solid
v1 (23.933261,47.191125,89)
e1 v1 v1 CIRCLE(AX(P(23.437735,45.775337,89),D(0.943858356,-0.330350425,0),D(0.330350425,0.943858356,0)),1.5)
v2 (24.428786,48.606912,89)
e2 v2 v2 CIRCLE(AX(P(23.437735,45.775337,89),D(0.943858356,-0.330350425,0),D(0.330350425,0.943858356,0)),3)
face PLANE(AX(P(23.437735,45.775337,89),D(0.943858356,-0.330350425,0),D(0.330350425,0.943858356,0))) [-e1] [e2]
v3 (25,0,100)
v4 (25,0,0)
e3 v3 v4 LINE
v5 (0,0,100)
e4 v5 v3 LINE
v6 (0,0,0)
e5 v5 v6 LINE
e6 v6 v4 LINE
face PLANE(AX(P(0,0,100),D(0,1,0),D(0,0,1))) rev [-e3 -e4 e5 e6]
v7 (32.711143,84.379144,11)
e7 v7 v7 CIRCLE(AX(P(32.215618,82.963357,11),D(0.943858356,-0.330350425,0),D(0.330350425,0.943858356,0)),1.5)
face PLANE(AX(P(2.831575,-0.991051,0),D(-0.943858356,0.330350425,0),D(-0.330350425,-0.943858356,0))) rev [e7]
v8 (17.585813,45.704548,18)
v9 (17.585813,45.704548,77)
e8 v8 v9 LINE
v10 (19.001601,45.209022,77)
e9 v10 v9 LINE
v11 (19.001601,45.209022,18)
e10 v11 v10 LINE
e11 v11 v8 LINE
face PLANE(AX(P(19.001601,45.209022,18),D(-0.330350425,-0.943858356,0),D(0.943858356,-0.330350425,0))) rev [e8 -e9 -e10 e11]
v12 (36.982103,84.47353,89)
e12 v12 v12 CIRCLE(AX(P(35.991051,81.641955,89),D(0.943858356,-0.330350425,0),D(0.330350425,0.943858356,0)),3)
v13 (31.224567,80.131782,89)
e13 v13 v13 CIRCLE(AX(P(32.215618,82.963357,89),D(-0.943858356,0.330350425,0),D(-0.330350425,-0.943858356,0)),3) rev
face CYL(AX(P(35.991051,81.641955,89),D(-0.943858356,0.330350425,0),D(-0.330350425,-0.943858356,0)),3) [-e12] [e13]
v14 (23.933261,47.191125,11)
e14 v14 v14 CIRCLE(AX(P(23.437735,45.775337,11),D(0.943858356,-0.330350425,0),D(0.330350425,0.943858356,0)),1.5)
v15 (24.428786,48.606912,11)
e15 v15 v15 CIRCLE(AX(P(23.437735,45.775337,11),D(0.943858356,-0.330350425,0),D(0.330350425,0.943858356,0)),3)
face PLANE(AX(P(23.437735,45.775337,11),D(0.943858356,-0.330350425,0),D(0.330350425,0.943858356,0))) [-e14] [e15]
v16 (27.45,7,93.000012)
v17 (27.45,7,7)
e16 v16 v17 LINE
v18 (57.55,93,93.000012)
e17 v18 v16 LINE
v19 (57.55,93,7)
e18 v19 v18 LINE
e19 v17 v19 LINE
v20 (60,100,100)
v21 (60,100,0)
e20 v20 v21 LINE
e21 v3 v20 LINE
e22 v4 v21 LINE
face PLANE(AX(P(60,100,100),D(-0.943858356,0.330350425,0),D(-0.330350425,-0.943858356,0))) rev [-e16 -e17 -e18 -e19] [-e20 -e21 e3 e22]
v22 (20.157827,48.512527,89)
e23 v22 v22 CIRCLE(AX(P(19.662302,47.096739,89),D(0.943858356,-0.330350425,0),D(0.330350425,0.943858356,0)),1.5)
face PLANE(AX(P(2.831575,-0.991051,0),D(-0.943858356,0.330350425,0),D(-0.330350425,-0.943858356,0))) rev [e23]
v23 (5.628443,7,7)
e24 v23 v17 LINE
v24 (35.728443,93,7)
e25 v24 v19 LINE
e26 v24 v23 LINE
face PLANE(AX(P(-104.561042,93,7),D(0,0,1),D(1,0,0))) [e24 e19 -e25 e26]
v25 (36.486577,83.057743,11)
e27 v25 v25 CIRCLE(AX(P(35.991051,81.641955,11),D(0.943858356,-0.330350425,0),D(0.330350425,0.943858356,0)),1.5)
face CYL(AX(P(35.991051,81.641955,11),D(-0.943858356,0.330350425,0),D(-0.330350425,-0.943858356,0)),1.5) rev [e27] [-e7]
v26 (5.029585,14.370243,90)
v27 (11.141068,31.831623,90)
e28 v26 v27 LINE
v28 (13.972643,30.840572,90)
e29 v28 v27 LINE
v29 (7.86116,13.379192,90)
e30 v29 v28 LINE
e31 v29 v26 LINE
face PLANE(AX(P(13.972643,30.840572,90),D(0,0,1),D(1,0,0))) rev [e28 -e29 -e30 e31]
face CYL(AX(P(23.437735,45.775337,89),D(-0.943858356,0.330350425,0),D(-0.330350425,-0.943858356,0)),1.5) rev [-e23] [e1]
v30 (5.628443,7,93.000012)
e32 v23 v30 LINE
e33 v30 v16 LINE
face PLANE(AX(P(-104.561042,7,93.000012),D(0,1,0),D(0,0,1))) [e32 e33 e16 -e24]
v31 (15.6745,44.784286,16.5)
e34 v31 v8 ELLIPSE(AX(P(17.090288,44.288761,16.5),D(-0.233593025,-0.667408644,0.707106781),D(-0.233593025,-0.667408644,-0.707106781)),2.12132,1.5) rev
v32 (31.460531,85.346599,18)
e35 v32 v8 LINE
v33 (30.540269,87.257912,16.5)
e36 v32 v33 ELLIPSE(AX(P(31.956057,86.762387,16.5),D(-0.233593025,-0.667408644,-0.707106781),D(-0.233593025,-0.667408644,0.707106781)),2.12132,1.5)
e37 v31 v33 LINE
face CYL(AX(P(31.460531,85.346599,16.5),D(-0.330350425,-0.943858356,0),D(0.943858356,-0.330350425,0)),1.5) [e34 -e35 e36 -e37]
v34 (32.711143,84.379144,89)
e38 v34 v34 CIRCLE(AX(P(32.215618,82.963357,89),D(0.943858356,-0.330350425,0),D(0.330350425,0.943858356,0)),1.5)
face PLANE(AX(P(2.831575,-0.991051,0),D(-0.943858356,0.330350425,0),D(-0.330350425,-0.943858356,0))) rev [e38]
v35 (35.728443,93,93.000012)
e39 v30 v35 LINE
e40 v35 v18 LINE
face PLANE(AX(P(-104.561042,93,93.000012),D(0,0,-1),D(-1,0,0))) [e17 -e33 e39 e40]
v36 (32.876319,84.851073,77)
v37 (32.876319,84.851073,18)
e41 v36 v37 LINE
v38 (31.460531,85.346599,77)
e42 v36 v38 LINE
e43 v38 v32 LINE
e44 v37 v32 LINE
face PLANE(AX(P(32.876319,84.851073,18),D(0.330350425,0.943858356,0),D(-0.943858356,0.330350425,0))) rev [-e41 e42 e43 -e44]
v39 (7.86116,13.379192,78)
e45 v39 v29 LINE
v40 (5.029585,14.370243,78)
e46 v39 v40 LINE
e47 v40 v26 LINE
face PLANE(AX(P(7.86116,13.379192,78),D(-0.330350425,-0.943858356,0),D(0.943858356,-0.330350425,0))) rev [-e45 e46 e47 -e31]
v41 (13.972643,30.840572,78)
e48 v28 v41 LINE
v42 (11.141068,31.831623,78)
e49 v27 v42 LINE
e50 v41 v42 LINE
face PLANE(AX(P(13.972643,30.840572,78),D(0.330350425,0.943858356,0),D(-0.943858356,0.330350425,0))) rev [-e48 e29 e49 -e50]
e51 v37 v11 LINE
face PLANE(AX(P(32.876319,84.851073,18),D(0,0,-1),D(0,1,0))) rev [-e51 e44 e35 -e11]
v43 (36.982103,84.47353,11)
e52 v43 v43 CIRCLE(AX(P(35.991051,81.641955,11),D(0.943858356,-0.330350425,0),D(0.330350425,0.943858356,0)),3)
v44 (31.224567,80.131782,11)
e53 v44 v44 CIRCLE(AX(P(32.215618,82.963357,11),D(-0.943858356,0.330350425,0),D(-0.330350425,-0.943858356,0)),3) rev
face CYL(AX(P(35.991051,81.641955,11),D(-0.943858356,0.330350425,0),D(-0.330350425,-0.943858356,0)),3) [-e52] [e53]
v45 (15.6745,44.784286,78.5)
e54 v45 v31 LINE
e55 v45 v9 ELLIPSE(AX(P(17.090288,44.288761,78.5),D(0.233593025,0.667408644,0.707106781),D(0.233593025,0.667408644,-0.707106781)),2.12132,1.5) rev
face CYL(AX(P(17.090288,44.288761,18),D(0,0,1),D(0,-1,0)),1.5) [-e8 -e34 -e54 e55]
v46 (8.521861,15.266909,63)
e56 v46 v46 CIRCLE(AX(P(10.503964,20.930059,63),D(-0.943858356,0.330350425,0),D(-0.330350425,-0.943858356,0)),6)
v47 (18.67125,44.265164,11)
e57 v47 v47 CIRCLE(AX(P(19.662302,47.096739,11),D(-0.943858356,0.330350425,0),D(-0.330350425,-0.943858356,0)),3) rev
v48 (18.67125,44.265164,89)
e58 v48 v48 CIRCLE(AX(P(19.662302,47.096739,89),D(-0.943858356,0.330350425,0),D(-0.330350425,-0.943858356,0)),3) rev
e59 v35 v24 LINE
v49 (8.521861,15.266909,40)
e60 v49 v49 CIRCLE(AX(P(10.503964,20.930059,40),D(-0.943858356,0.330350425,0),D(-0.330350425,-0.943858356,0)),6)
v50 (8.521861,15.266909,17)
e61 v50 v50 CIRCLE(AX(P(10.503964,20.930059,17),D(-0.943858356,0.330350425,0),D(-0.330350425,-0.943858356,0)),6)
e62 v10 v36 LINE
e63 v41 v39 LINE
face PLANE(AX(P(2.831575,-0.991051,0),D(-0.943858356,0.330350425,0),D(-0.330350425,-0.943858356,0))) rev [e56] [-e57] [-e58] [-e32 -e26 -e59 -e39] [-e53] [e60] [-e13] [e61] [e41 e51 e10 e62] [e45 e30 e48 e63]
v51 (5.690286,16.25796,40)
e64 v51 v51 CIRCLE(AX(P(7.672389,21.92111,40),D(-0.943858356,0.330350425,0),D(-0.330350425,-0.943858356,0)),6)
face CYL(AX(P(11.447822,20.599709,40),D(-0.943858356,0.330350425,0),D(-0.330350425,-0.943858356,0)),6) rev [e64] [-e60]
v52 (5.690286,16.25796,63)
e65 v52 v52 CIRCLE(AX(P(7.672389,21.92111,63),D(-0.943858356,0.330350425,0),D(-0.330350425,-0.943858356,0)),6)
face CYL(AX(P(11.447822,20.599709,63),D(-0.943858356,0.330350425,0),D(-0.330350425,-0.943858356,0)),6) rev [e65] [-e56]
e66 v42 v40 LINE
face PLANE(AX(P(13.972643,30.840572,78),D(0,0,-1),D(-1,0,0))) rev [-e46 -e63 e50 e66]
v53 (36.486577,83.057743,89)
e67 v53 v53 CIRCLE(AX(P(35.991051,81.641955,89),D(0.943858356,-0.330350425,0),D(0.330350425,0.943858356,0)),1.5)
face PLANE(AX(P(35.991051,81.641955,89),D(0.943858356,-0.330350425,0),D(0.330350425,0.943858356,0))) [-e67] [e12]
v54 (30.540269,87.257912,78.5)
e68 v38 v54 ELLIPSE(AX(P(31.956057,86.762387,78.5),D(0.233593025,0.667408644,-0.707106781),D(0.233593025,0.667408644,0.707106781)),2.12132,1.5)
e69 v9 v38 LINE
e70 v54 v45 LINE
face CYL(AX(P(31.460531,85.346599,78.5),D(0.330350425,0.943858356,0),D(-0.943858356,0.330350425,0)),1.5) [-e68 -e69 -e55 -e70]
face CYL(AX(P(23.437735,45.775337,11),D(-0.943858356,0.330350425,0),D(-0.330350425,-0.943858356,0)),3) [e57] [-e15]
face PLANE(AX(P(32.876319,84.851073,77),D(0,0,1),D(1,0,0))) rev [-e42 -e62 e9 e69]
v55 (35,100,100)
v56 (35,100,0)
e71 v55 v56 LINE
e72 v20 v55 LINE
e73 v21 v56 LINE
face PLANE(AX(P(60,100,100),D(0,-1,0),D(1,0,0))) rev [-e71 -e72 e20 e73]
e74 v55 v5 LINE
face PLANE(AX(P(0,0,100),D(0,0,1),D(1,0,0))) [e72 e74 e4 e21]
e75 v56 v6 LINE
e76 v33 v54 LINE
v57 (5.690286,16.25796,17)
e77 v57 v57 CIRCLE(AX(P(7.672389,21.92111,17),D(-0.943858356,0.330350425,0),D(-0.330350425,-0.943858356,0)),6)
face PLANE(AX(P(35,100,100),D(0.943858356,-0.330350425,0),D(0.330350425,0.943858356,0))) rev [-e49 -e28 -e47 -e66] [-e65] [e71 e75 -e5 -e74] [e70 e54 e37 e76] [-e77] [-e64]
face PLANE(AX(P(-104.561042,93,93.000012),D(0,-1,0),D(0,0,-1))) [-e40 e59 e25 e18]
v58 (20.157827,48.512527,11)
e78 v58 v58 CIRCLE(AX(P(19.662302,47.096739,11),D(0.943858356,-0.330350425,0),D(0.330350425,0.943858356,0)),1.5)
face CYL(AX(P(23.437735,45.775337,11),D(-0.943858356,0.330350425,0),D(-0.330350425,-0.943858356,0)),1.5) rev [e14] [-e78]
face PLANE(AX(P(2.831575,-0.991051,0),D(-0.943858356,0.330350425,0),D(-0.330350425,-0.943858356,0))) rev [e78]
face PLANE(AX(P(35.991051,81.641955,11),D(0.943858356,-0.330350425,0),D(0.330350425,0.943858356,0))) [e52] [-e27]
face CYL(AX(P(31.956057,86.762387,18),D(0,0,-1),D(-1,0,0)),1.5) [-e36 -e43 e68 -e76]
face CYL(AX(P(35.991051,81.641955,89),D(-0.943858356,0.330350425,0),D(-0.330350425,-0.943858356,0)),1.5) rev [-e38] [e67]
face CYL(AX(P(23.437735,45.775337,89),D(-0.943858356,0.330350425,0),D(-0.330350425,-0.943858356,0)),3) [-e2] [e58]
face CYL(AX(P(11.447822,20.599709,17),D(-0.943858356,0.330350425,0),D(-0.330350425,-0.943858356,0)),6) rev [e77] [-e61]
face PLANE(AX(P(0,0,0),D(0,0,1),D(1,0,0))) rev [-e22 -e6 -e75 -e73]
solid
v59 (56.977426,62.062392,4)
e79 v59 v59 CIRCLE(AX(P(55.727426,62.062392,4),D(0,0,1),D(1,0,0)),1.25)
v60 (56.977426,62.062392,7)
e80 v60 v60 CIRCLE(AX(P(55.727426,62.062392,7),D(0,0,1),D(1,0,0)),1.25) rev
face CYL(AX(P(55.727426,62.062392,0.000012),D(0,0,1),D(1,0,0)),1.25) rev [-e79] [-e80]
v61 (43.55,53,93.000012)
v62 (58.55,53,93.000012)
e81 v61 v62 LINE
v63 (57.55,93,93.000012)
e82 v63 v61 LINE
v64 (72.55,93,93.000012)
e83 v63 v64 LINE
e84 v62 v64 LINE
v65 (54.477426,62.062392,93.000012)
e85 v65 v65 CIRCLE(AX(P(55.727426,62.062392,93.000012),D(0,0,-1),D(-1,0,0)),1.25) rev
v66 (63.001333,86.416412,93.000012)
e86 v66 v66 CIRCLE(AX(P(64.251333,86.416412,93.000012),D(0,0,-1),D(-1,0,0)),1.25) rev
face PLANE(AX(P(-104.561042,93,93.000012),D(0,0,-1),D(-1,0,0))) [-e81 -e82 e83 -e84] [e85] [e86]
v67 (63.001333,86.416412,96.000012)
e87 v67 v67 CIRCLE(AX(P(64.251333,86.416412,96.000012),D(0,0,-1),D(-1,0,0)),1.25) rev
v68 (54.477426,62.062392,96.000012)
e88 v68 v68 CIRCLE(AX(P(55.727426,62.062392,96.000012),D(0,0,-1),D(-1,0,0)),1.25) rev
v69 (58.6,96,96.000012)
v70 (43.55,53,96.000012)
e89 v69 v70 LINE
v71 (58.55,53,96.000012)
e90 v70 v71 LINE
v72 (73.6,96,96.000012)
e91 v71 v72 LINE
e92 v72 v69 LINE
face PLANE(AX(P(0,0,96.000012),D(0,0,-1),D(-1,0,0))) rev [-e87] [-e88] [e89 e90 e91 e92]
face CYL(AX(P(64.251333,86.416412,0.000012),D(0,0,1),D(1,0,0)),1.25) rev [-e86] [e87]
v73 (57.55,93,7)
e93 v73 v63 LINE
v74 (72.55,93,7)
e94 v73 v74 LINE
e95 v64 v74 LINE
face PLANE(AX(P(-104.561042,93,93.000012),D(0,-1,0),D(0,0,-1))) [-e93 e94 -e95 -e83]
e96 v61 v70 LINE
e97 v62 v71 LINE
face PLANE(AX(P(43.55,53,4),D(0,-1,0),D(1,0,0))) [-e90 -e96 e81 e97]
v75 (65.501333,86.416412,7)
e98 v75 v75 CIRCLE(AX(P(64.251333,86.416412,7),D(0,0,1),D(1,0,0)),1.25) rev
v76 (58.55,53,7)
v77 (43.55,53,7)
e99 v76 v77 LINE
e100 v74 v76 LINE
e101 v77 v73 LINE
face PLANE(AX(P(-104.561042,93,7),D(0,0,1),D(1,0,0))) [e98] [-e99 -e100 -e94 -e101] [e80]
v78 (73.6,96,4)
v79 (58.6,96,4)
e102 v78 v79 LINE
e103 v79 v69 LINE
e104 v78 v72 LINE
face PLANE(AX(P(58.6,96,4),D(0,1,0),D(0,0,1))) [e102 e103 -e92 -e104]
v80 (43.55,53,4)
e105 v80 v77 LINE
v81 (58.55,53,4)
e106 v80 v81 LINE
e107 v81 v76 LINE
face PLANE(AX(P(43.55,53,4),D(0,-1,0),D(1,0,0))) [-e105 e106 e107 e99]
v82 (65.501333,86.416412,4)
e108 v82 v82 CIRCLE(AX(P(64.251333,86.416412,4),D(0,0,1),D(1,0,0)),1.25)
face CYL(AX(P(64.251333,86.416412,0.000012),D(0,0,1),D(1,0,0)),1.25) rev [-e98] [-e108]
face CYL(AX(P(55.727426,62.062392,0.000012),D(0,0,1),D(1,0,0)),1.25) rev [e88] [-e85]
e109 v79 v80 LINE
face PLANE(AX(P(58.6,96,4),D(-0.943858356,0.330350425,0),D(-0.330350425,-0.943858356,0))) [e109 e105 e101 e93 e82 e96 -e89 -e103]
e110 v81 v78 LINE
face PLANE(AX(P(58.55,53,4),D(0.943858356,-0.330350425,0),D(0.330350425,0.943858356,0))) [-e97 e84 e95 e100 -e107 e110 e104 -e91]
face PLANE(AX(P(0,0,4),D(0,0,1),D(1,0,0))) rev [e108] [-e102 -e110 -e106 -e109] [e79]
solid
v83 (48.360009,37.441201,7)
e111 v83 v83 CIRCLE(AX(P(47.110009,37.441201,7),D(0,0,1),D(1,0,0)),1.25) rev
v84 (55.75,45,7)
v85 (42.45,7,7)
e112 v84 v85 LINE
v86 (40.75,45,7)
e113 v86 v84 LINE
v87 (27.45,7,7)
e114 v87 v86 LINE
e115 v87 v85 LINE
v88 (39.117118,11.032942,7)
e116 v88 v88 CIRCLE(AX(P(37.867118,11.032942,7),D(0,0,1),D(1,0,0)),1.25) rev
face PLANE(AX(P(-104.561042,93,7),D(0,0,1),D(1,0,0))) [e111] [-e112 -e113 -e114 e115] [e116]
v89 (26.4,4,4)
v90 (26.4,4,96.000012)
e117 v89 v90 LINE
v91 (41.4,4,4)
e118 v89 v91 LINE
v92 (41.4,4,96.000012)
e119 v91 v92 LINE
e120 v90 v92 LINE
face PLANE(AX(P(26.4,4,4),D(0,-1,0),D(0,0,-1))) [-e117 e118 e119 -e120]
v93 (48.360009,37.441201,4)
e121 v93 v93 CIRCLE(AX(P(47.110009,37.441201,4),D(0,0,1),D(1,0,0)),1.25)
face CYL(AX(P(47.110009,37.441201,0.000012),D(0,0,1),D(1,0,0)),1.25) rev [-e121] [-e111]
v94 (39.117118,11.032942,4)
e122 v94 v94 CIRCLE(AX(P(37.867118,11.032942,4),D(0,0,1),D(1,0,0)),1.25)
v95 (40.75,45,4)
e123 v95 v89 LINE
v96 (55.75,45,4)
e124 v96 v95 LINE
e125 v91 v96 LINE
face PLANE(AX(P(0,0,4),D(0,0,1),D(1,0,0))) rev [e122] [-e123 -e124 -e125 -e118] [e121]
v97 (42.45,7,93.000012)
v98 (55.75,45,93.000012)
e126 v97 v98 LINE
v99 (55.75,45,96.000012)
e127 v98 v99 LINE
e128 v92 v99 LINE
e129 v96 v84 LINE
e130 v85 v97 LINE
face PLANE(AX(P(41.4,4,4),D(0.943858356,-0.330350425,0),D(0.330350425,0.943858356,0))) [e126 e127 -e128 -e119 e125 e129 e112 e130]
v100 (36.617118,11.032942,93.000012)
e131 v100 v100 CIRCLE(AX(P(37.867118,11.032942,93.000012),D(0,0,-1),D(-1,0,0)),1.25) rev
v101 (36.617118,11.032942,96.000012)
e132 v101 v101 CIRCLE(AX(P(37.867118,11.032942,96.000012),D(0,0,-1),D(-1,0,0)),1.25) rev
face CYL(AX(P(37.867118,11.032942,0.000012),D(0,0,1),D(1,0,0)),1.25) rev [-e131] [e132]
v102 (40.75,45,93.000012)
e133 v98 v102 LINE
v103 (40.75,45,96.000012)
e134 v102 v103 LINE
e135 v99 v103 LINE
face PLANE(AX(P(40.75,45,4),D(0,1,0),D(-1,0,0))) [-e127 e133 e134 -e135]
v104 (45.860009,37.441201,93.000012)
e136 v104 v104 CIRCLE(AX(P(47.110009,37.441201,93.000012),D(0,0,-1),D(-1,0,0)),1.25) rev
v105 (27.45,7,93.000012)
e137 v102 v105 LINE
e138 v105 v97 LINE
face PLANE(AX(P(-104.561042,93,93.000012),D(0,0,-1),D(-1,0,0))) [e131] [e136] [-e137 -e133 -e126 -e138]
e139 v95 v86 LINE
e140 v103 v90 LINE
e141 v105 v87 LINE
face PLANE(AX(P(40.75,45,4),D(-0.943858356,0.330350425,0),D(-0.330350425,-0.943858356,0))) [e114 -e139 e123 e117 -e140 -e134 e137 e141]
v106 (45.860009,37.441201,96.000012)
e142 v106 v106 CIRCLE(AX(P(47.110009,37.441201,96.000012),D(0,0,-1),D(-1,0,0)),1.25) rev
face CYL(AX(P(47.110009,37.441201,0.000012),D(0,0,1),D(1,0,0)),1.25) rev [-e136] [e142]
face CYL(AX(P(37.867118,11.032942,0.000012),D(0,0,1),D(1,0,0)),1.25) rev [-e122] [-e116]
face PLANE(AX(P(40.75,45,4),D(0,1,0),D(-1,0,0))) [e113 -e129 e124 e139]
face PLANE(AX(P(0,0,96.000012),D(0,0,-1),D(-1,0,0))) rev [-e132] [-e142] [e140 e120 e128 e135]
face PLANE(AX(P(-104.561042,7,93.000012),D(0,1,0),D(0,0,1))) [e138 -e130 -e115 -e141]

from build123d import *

# Parameters (mm, degrees)
DODANIE_WYCI_GNI_CIE1_DEPTH    = 100
DODANIE_WYCI_GNI_CIE2_START    = -96
DODANIE_WYCI_GNI_CIE2_DEPTH    = 96.000012
SZKIC3_R                       = 1.25
WYTNIJ_WYCI_GNI_CIE2_DEPTH     = 100
WYTNIJ_WYCI_GNI_CIE3_DEPTH     = 4
WYTNIJ_WYCI_GNI_CIE4_START     = 7
WYTNIJ_WYCI_GNI_CIE4_OUTLINE_R = 1.25
WYTNIJ_WYCI_GNI_CIE4_DEPTH     = 86.000012
SZKIC9_W                       = 59
SZKIC9_H                       = 42
SZKIC9_W_2                     = 12
SZKIC9_H_2                     = 18.5
WYTNIJ_WYCI_GNI_CIE5_DEPTH     = 3
SZKIC10_R                      = 3
SZKIC10_R_2                    = 1.5
DODANIE_WYCI_GNI_CIE3_DEPTH    = 4
SZKIC13_R                      = 6
WYTNIJ_WYCI_GNI_CIE6_DEPTH     = 4
ZAOKR_GLENIE1_R                = 1.5


# Read off the part's stored shape, not the designer's step: Dodanie-wyciągnięcie2, Wytnij-wyciągnięcie4
with BuildPart() as part:
    # Szkic1 → Dodanie-wyciągnięcie1 (new body)
    with BuildSketch(Plane.XY):
        Polygon((0, 0), (25, 0), (60, 100), (35, 100), align=None)
    extrude(amount=DODANIE_WYCI_GNI_CIE1_DEPTH)


with BuildPart() as body_2:
    # Dodanie-wyciągnięcie2 outline → Dodanie-wyciągnięcie2 (new body)
    with BuildSketch(Plane.XY.offset(100).offset(DODANIE_WYCI_GNI_CIE2_START)):
        Polygon((73.6, 96), (58.6, 96), (43.55, 53), (58.55, 53), align=None)
        Polygon((55.75, 45), (40.75, 45), (26.4, 4), (41.4, 4), align=None)
    extrude(amount=DODANIE_WYCI_GNI_CIE2_DEPTH)

    # Szkic3 → Wytnij-wyciągnięcie2 (cut)
    with BuildSketch(Plane.XY.offset(100.000012)):
        with Locations((64.251332646, 86.416411722)):
            Circle(SZKIC3_R)
        with Locations((55.727425581, 62.062391537)):
            Circle(SZKIC3_R)
        with Locations((47.110009053, 37.441201457)):
            Circle(SZKIC3_R)
        with Locations((37.867118116, 11.032941637)):
            Circle(SZKIC3_R)
    extrude(amount=-WYTNIJ_WYCI_GNI_CIE2_DEPTH, mode=Mode.SUBTRACT)

    # Szkic4 → Wytnij-wyciągnięcie3 (cut)
    with BuildSketch(Plane.XY.offset(100.000012)):
        Polygon((26.4, 4), (58.6, 96), (73.6, 96), (41.4, 4), align=None)
    extrude(amount=-WYTNIJ_WYCI_GNI_CIE3_DEPTH, mode=Mode.SUBTRACT)


with BuildPart() as wytnij_wyci_gni_cie4_tool:
    # Wytnij-wyciągnięcie4 outline → Wytnij-wyciągnięcie4 (new body)
    with BuildSketch(Plane.XY.offset(WYTNIJ_WYCI_GNI_CIE4_START)):
        Polygon((40.75, 45), (43.55, 53), (58.55, 53), (72.55, 93), (35.728443015, 93), (5.628443015, 7), (42.45, 7), (55.75, 45), align=None)
        with Locations((64.251332646, 86.416411722)):
            Circle(WYTNIJ_WYCI_GNI_CIE4_OUTLINE_R, mode=Mode.SUBTRACT)
        with Locations((55.727425581, 62.062391537)):
            Circle(WYTNIJ_WYCI_GNI_CIE4_OUTLINE_R, mode=Mode.SUBTRACT)
        with Locations((47.110009053, 37.441201457)):
            Circle(WYTNIJ_WYCI_GNI_CIE4_OUTLINE_R, mode=Mode.SUBTRACT)
        with Locations((37.867118116, 11.032941637)):
            Circle(WYTNIJ_WYCI_GNI_CIE4_OUTLINE_R, mode=Mode.SUBTRACT)
    extrude(amount=WYTNIJ_WYCI_GNI_CIE4_DEPTH)


with BuildPart() as part_1:
    add(part.part)

    # Wytnij-wyciągnięcie4: cut by wytnij_wyci_gni_cie4_tool
    add(wytnij_wyci_gni_cie4_tool.part, mode=Mode.SUBTRACT)

    # Szkic9 → Wytnij-wyciągnięcie5 (cut)
    with BuildSketch(Plane(origin=(0, 0, 0), x_dir=(0, 0, 1), z_dir=(-0.9438583563660174, 0.33035042472810605, 0))):
        with Locations((47.5, 69.948100502)):
            Rectangle(SZKIC9_W, SZKIC9_H)
        with Locations((84, 24.475)):
            Rectangle(SZKIC9_W_2, SZKIC9_H_2)
    extrude(amount=-WYTNIJ_WYCI_GNI_CIE5_DEPTH, mode=Mode.SUBTRACT)

    # Szkic10 → Dodanie-wyciągnięcie3 (add)
    # profile 1 of 4: a face of its own
    with BuildSketch(Plane(origin=(2.831575069, -0.991051274, 0), x_dir=(0, 0, -1), z_dir=(0.9438583563660174, -0.33035042472810605, 0))):
        with Locations(Location((-89, 88.948100502, 0), (0, 0, 270))):
            Circle(SZKIC10_R)
        with Locations(Location((-89, 88.948100502, 0), (0, 0, 90))):
            Circle(SZKIC10_R_2, mode=Mode.SUBTRACT)
    # profile 2 of 4: a face of its own
    with BuildSketch(Plane(origin=(2.831575069, -0.991051274, 0), x_dir=(0, 0, -1), z_dir=(0.9438583563660174, -0.33035042472810605, 0))):
        with Locations(Location((-89, 50.948100502, 0), (0, 0, 270))):
            Circle(SZKIC10_R)
        with Locations(Location((-89, 50.948100502, 0), (0, 0, 90))):
            Circle(SZKIC10_R_2, mode=Mode.SUBTRACT)
    # profile 3 of 4: a face of its own
    with BuildSketch(Plane(origin=(2.831575069, -0.991051274, 0), x_dir=(0, 0, -1), z_dir=(0.9438583563660174, -0.33035042472810605, 0))):
        with Locations(Location((-11, 50.948100502, 0), (0, 0, 270))):
            Circle(SZKIC10_R)
        with Locations(Location((-11, 50.948100502, 0), (0, 0, 90))):
            Circle(SZKIC10_R_2, mode=Mode.SUBTRACT)
    # profile 4 of 4: a face of its own
    with BuildSketch(Plane(origin=(2.831575069, -0.991051274, 0), x_dir=(0, 0, -1), z_dir=(0.9438583563660174, -0.33035042472810605, 0))):
        with Locations(Location((-11, 88.948100502, 0), (0, 0, 270))):
            Circle(SZKIC10_R)
        with Locations(Location((-11, 88.948100502, 0), (0, 0, 90))):
            Circle(SZKIC10_R_2, mode=Mode.SUBTRACT)
    extrude(amount=DODANIE_WYCI_GNI_CIE3_DEPTH)

    # Szkic13 → Wytnij-wyciągnięcie6 (cut)
    with BuildSketch(Plane(origin=(0, 0, 0), x_dir=(0, 0, 1), z_dir=(-0.9438583563660174, 0.33035042472810605, 0))):
        with Locations(Location((17, 23.225, 0), (0, 0, 270))):
            Circle(SZKIC13_R)
        with Locations(Location((40, 23.225, 0), (0, 0, 270))):
            Circle(SZKIC13_R)
        with Locations(Location((63, 23.225, 0), (0, 0, 270))):
            Circle(SZKIC13_R)
    extrude(amount=-WYTNIJ_WYCI_GNI_CIE6_DEPTH, mode=Mode.SUBTRACT)

    # Zaokrąglenie1
    zaokr_glenie1_edges = [part_1.edges().sort_by_distance(p)[0] for p in [
        (23.10738471, 66.021099171, 18),
        (16.17002579, 46.200073687, 47.5),
        (23.10738471, 66.021099171, 77),
        (30.044743629, 85.842124655, 47.5),
    ]]
    fillet(zaokr_glenie1_edges, radius=ZAOKR_GLENIE1_R)


with BuildPart() as body_2_1:
    add(body_2.part)

    # Wytnij-wyciągnięcie4: cut by wytnij_wyci_gni_cie4_tool
    add(wytnij_wyci_gni_cie4_tool.part, mode=Mode.SUBTRACT)


solid = Compound([part_1.part, body_2_1.part])
